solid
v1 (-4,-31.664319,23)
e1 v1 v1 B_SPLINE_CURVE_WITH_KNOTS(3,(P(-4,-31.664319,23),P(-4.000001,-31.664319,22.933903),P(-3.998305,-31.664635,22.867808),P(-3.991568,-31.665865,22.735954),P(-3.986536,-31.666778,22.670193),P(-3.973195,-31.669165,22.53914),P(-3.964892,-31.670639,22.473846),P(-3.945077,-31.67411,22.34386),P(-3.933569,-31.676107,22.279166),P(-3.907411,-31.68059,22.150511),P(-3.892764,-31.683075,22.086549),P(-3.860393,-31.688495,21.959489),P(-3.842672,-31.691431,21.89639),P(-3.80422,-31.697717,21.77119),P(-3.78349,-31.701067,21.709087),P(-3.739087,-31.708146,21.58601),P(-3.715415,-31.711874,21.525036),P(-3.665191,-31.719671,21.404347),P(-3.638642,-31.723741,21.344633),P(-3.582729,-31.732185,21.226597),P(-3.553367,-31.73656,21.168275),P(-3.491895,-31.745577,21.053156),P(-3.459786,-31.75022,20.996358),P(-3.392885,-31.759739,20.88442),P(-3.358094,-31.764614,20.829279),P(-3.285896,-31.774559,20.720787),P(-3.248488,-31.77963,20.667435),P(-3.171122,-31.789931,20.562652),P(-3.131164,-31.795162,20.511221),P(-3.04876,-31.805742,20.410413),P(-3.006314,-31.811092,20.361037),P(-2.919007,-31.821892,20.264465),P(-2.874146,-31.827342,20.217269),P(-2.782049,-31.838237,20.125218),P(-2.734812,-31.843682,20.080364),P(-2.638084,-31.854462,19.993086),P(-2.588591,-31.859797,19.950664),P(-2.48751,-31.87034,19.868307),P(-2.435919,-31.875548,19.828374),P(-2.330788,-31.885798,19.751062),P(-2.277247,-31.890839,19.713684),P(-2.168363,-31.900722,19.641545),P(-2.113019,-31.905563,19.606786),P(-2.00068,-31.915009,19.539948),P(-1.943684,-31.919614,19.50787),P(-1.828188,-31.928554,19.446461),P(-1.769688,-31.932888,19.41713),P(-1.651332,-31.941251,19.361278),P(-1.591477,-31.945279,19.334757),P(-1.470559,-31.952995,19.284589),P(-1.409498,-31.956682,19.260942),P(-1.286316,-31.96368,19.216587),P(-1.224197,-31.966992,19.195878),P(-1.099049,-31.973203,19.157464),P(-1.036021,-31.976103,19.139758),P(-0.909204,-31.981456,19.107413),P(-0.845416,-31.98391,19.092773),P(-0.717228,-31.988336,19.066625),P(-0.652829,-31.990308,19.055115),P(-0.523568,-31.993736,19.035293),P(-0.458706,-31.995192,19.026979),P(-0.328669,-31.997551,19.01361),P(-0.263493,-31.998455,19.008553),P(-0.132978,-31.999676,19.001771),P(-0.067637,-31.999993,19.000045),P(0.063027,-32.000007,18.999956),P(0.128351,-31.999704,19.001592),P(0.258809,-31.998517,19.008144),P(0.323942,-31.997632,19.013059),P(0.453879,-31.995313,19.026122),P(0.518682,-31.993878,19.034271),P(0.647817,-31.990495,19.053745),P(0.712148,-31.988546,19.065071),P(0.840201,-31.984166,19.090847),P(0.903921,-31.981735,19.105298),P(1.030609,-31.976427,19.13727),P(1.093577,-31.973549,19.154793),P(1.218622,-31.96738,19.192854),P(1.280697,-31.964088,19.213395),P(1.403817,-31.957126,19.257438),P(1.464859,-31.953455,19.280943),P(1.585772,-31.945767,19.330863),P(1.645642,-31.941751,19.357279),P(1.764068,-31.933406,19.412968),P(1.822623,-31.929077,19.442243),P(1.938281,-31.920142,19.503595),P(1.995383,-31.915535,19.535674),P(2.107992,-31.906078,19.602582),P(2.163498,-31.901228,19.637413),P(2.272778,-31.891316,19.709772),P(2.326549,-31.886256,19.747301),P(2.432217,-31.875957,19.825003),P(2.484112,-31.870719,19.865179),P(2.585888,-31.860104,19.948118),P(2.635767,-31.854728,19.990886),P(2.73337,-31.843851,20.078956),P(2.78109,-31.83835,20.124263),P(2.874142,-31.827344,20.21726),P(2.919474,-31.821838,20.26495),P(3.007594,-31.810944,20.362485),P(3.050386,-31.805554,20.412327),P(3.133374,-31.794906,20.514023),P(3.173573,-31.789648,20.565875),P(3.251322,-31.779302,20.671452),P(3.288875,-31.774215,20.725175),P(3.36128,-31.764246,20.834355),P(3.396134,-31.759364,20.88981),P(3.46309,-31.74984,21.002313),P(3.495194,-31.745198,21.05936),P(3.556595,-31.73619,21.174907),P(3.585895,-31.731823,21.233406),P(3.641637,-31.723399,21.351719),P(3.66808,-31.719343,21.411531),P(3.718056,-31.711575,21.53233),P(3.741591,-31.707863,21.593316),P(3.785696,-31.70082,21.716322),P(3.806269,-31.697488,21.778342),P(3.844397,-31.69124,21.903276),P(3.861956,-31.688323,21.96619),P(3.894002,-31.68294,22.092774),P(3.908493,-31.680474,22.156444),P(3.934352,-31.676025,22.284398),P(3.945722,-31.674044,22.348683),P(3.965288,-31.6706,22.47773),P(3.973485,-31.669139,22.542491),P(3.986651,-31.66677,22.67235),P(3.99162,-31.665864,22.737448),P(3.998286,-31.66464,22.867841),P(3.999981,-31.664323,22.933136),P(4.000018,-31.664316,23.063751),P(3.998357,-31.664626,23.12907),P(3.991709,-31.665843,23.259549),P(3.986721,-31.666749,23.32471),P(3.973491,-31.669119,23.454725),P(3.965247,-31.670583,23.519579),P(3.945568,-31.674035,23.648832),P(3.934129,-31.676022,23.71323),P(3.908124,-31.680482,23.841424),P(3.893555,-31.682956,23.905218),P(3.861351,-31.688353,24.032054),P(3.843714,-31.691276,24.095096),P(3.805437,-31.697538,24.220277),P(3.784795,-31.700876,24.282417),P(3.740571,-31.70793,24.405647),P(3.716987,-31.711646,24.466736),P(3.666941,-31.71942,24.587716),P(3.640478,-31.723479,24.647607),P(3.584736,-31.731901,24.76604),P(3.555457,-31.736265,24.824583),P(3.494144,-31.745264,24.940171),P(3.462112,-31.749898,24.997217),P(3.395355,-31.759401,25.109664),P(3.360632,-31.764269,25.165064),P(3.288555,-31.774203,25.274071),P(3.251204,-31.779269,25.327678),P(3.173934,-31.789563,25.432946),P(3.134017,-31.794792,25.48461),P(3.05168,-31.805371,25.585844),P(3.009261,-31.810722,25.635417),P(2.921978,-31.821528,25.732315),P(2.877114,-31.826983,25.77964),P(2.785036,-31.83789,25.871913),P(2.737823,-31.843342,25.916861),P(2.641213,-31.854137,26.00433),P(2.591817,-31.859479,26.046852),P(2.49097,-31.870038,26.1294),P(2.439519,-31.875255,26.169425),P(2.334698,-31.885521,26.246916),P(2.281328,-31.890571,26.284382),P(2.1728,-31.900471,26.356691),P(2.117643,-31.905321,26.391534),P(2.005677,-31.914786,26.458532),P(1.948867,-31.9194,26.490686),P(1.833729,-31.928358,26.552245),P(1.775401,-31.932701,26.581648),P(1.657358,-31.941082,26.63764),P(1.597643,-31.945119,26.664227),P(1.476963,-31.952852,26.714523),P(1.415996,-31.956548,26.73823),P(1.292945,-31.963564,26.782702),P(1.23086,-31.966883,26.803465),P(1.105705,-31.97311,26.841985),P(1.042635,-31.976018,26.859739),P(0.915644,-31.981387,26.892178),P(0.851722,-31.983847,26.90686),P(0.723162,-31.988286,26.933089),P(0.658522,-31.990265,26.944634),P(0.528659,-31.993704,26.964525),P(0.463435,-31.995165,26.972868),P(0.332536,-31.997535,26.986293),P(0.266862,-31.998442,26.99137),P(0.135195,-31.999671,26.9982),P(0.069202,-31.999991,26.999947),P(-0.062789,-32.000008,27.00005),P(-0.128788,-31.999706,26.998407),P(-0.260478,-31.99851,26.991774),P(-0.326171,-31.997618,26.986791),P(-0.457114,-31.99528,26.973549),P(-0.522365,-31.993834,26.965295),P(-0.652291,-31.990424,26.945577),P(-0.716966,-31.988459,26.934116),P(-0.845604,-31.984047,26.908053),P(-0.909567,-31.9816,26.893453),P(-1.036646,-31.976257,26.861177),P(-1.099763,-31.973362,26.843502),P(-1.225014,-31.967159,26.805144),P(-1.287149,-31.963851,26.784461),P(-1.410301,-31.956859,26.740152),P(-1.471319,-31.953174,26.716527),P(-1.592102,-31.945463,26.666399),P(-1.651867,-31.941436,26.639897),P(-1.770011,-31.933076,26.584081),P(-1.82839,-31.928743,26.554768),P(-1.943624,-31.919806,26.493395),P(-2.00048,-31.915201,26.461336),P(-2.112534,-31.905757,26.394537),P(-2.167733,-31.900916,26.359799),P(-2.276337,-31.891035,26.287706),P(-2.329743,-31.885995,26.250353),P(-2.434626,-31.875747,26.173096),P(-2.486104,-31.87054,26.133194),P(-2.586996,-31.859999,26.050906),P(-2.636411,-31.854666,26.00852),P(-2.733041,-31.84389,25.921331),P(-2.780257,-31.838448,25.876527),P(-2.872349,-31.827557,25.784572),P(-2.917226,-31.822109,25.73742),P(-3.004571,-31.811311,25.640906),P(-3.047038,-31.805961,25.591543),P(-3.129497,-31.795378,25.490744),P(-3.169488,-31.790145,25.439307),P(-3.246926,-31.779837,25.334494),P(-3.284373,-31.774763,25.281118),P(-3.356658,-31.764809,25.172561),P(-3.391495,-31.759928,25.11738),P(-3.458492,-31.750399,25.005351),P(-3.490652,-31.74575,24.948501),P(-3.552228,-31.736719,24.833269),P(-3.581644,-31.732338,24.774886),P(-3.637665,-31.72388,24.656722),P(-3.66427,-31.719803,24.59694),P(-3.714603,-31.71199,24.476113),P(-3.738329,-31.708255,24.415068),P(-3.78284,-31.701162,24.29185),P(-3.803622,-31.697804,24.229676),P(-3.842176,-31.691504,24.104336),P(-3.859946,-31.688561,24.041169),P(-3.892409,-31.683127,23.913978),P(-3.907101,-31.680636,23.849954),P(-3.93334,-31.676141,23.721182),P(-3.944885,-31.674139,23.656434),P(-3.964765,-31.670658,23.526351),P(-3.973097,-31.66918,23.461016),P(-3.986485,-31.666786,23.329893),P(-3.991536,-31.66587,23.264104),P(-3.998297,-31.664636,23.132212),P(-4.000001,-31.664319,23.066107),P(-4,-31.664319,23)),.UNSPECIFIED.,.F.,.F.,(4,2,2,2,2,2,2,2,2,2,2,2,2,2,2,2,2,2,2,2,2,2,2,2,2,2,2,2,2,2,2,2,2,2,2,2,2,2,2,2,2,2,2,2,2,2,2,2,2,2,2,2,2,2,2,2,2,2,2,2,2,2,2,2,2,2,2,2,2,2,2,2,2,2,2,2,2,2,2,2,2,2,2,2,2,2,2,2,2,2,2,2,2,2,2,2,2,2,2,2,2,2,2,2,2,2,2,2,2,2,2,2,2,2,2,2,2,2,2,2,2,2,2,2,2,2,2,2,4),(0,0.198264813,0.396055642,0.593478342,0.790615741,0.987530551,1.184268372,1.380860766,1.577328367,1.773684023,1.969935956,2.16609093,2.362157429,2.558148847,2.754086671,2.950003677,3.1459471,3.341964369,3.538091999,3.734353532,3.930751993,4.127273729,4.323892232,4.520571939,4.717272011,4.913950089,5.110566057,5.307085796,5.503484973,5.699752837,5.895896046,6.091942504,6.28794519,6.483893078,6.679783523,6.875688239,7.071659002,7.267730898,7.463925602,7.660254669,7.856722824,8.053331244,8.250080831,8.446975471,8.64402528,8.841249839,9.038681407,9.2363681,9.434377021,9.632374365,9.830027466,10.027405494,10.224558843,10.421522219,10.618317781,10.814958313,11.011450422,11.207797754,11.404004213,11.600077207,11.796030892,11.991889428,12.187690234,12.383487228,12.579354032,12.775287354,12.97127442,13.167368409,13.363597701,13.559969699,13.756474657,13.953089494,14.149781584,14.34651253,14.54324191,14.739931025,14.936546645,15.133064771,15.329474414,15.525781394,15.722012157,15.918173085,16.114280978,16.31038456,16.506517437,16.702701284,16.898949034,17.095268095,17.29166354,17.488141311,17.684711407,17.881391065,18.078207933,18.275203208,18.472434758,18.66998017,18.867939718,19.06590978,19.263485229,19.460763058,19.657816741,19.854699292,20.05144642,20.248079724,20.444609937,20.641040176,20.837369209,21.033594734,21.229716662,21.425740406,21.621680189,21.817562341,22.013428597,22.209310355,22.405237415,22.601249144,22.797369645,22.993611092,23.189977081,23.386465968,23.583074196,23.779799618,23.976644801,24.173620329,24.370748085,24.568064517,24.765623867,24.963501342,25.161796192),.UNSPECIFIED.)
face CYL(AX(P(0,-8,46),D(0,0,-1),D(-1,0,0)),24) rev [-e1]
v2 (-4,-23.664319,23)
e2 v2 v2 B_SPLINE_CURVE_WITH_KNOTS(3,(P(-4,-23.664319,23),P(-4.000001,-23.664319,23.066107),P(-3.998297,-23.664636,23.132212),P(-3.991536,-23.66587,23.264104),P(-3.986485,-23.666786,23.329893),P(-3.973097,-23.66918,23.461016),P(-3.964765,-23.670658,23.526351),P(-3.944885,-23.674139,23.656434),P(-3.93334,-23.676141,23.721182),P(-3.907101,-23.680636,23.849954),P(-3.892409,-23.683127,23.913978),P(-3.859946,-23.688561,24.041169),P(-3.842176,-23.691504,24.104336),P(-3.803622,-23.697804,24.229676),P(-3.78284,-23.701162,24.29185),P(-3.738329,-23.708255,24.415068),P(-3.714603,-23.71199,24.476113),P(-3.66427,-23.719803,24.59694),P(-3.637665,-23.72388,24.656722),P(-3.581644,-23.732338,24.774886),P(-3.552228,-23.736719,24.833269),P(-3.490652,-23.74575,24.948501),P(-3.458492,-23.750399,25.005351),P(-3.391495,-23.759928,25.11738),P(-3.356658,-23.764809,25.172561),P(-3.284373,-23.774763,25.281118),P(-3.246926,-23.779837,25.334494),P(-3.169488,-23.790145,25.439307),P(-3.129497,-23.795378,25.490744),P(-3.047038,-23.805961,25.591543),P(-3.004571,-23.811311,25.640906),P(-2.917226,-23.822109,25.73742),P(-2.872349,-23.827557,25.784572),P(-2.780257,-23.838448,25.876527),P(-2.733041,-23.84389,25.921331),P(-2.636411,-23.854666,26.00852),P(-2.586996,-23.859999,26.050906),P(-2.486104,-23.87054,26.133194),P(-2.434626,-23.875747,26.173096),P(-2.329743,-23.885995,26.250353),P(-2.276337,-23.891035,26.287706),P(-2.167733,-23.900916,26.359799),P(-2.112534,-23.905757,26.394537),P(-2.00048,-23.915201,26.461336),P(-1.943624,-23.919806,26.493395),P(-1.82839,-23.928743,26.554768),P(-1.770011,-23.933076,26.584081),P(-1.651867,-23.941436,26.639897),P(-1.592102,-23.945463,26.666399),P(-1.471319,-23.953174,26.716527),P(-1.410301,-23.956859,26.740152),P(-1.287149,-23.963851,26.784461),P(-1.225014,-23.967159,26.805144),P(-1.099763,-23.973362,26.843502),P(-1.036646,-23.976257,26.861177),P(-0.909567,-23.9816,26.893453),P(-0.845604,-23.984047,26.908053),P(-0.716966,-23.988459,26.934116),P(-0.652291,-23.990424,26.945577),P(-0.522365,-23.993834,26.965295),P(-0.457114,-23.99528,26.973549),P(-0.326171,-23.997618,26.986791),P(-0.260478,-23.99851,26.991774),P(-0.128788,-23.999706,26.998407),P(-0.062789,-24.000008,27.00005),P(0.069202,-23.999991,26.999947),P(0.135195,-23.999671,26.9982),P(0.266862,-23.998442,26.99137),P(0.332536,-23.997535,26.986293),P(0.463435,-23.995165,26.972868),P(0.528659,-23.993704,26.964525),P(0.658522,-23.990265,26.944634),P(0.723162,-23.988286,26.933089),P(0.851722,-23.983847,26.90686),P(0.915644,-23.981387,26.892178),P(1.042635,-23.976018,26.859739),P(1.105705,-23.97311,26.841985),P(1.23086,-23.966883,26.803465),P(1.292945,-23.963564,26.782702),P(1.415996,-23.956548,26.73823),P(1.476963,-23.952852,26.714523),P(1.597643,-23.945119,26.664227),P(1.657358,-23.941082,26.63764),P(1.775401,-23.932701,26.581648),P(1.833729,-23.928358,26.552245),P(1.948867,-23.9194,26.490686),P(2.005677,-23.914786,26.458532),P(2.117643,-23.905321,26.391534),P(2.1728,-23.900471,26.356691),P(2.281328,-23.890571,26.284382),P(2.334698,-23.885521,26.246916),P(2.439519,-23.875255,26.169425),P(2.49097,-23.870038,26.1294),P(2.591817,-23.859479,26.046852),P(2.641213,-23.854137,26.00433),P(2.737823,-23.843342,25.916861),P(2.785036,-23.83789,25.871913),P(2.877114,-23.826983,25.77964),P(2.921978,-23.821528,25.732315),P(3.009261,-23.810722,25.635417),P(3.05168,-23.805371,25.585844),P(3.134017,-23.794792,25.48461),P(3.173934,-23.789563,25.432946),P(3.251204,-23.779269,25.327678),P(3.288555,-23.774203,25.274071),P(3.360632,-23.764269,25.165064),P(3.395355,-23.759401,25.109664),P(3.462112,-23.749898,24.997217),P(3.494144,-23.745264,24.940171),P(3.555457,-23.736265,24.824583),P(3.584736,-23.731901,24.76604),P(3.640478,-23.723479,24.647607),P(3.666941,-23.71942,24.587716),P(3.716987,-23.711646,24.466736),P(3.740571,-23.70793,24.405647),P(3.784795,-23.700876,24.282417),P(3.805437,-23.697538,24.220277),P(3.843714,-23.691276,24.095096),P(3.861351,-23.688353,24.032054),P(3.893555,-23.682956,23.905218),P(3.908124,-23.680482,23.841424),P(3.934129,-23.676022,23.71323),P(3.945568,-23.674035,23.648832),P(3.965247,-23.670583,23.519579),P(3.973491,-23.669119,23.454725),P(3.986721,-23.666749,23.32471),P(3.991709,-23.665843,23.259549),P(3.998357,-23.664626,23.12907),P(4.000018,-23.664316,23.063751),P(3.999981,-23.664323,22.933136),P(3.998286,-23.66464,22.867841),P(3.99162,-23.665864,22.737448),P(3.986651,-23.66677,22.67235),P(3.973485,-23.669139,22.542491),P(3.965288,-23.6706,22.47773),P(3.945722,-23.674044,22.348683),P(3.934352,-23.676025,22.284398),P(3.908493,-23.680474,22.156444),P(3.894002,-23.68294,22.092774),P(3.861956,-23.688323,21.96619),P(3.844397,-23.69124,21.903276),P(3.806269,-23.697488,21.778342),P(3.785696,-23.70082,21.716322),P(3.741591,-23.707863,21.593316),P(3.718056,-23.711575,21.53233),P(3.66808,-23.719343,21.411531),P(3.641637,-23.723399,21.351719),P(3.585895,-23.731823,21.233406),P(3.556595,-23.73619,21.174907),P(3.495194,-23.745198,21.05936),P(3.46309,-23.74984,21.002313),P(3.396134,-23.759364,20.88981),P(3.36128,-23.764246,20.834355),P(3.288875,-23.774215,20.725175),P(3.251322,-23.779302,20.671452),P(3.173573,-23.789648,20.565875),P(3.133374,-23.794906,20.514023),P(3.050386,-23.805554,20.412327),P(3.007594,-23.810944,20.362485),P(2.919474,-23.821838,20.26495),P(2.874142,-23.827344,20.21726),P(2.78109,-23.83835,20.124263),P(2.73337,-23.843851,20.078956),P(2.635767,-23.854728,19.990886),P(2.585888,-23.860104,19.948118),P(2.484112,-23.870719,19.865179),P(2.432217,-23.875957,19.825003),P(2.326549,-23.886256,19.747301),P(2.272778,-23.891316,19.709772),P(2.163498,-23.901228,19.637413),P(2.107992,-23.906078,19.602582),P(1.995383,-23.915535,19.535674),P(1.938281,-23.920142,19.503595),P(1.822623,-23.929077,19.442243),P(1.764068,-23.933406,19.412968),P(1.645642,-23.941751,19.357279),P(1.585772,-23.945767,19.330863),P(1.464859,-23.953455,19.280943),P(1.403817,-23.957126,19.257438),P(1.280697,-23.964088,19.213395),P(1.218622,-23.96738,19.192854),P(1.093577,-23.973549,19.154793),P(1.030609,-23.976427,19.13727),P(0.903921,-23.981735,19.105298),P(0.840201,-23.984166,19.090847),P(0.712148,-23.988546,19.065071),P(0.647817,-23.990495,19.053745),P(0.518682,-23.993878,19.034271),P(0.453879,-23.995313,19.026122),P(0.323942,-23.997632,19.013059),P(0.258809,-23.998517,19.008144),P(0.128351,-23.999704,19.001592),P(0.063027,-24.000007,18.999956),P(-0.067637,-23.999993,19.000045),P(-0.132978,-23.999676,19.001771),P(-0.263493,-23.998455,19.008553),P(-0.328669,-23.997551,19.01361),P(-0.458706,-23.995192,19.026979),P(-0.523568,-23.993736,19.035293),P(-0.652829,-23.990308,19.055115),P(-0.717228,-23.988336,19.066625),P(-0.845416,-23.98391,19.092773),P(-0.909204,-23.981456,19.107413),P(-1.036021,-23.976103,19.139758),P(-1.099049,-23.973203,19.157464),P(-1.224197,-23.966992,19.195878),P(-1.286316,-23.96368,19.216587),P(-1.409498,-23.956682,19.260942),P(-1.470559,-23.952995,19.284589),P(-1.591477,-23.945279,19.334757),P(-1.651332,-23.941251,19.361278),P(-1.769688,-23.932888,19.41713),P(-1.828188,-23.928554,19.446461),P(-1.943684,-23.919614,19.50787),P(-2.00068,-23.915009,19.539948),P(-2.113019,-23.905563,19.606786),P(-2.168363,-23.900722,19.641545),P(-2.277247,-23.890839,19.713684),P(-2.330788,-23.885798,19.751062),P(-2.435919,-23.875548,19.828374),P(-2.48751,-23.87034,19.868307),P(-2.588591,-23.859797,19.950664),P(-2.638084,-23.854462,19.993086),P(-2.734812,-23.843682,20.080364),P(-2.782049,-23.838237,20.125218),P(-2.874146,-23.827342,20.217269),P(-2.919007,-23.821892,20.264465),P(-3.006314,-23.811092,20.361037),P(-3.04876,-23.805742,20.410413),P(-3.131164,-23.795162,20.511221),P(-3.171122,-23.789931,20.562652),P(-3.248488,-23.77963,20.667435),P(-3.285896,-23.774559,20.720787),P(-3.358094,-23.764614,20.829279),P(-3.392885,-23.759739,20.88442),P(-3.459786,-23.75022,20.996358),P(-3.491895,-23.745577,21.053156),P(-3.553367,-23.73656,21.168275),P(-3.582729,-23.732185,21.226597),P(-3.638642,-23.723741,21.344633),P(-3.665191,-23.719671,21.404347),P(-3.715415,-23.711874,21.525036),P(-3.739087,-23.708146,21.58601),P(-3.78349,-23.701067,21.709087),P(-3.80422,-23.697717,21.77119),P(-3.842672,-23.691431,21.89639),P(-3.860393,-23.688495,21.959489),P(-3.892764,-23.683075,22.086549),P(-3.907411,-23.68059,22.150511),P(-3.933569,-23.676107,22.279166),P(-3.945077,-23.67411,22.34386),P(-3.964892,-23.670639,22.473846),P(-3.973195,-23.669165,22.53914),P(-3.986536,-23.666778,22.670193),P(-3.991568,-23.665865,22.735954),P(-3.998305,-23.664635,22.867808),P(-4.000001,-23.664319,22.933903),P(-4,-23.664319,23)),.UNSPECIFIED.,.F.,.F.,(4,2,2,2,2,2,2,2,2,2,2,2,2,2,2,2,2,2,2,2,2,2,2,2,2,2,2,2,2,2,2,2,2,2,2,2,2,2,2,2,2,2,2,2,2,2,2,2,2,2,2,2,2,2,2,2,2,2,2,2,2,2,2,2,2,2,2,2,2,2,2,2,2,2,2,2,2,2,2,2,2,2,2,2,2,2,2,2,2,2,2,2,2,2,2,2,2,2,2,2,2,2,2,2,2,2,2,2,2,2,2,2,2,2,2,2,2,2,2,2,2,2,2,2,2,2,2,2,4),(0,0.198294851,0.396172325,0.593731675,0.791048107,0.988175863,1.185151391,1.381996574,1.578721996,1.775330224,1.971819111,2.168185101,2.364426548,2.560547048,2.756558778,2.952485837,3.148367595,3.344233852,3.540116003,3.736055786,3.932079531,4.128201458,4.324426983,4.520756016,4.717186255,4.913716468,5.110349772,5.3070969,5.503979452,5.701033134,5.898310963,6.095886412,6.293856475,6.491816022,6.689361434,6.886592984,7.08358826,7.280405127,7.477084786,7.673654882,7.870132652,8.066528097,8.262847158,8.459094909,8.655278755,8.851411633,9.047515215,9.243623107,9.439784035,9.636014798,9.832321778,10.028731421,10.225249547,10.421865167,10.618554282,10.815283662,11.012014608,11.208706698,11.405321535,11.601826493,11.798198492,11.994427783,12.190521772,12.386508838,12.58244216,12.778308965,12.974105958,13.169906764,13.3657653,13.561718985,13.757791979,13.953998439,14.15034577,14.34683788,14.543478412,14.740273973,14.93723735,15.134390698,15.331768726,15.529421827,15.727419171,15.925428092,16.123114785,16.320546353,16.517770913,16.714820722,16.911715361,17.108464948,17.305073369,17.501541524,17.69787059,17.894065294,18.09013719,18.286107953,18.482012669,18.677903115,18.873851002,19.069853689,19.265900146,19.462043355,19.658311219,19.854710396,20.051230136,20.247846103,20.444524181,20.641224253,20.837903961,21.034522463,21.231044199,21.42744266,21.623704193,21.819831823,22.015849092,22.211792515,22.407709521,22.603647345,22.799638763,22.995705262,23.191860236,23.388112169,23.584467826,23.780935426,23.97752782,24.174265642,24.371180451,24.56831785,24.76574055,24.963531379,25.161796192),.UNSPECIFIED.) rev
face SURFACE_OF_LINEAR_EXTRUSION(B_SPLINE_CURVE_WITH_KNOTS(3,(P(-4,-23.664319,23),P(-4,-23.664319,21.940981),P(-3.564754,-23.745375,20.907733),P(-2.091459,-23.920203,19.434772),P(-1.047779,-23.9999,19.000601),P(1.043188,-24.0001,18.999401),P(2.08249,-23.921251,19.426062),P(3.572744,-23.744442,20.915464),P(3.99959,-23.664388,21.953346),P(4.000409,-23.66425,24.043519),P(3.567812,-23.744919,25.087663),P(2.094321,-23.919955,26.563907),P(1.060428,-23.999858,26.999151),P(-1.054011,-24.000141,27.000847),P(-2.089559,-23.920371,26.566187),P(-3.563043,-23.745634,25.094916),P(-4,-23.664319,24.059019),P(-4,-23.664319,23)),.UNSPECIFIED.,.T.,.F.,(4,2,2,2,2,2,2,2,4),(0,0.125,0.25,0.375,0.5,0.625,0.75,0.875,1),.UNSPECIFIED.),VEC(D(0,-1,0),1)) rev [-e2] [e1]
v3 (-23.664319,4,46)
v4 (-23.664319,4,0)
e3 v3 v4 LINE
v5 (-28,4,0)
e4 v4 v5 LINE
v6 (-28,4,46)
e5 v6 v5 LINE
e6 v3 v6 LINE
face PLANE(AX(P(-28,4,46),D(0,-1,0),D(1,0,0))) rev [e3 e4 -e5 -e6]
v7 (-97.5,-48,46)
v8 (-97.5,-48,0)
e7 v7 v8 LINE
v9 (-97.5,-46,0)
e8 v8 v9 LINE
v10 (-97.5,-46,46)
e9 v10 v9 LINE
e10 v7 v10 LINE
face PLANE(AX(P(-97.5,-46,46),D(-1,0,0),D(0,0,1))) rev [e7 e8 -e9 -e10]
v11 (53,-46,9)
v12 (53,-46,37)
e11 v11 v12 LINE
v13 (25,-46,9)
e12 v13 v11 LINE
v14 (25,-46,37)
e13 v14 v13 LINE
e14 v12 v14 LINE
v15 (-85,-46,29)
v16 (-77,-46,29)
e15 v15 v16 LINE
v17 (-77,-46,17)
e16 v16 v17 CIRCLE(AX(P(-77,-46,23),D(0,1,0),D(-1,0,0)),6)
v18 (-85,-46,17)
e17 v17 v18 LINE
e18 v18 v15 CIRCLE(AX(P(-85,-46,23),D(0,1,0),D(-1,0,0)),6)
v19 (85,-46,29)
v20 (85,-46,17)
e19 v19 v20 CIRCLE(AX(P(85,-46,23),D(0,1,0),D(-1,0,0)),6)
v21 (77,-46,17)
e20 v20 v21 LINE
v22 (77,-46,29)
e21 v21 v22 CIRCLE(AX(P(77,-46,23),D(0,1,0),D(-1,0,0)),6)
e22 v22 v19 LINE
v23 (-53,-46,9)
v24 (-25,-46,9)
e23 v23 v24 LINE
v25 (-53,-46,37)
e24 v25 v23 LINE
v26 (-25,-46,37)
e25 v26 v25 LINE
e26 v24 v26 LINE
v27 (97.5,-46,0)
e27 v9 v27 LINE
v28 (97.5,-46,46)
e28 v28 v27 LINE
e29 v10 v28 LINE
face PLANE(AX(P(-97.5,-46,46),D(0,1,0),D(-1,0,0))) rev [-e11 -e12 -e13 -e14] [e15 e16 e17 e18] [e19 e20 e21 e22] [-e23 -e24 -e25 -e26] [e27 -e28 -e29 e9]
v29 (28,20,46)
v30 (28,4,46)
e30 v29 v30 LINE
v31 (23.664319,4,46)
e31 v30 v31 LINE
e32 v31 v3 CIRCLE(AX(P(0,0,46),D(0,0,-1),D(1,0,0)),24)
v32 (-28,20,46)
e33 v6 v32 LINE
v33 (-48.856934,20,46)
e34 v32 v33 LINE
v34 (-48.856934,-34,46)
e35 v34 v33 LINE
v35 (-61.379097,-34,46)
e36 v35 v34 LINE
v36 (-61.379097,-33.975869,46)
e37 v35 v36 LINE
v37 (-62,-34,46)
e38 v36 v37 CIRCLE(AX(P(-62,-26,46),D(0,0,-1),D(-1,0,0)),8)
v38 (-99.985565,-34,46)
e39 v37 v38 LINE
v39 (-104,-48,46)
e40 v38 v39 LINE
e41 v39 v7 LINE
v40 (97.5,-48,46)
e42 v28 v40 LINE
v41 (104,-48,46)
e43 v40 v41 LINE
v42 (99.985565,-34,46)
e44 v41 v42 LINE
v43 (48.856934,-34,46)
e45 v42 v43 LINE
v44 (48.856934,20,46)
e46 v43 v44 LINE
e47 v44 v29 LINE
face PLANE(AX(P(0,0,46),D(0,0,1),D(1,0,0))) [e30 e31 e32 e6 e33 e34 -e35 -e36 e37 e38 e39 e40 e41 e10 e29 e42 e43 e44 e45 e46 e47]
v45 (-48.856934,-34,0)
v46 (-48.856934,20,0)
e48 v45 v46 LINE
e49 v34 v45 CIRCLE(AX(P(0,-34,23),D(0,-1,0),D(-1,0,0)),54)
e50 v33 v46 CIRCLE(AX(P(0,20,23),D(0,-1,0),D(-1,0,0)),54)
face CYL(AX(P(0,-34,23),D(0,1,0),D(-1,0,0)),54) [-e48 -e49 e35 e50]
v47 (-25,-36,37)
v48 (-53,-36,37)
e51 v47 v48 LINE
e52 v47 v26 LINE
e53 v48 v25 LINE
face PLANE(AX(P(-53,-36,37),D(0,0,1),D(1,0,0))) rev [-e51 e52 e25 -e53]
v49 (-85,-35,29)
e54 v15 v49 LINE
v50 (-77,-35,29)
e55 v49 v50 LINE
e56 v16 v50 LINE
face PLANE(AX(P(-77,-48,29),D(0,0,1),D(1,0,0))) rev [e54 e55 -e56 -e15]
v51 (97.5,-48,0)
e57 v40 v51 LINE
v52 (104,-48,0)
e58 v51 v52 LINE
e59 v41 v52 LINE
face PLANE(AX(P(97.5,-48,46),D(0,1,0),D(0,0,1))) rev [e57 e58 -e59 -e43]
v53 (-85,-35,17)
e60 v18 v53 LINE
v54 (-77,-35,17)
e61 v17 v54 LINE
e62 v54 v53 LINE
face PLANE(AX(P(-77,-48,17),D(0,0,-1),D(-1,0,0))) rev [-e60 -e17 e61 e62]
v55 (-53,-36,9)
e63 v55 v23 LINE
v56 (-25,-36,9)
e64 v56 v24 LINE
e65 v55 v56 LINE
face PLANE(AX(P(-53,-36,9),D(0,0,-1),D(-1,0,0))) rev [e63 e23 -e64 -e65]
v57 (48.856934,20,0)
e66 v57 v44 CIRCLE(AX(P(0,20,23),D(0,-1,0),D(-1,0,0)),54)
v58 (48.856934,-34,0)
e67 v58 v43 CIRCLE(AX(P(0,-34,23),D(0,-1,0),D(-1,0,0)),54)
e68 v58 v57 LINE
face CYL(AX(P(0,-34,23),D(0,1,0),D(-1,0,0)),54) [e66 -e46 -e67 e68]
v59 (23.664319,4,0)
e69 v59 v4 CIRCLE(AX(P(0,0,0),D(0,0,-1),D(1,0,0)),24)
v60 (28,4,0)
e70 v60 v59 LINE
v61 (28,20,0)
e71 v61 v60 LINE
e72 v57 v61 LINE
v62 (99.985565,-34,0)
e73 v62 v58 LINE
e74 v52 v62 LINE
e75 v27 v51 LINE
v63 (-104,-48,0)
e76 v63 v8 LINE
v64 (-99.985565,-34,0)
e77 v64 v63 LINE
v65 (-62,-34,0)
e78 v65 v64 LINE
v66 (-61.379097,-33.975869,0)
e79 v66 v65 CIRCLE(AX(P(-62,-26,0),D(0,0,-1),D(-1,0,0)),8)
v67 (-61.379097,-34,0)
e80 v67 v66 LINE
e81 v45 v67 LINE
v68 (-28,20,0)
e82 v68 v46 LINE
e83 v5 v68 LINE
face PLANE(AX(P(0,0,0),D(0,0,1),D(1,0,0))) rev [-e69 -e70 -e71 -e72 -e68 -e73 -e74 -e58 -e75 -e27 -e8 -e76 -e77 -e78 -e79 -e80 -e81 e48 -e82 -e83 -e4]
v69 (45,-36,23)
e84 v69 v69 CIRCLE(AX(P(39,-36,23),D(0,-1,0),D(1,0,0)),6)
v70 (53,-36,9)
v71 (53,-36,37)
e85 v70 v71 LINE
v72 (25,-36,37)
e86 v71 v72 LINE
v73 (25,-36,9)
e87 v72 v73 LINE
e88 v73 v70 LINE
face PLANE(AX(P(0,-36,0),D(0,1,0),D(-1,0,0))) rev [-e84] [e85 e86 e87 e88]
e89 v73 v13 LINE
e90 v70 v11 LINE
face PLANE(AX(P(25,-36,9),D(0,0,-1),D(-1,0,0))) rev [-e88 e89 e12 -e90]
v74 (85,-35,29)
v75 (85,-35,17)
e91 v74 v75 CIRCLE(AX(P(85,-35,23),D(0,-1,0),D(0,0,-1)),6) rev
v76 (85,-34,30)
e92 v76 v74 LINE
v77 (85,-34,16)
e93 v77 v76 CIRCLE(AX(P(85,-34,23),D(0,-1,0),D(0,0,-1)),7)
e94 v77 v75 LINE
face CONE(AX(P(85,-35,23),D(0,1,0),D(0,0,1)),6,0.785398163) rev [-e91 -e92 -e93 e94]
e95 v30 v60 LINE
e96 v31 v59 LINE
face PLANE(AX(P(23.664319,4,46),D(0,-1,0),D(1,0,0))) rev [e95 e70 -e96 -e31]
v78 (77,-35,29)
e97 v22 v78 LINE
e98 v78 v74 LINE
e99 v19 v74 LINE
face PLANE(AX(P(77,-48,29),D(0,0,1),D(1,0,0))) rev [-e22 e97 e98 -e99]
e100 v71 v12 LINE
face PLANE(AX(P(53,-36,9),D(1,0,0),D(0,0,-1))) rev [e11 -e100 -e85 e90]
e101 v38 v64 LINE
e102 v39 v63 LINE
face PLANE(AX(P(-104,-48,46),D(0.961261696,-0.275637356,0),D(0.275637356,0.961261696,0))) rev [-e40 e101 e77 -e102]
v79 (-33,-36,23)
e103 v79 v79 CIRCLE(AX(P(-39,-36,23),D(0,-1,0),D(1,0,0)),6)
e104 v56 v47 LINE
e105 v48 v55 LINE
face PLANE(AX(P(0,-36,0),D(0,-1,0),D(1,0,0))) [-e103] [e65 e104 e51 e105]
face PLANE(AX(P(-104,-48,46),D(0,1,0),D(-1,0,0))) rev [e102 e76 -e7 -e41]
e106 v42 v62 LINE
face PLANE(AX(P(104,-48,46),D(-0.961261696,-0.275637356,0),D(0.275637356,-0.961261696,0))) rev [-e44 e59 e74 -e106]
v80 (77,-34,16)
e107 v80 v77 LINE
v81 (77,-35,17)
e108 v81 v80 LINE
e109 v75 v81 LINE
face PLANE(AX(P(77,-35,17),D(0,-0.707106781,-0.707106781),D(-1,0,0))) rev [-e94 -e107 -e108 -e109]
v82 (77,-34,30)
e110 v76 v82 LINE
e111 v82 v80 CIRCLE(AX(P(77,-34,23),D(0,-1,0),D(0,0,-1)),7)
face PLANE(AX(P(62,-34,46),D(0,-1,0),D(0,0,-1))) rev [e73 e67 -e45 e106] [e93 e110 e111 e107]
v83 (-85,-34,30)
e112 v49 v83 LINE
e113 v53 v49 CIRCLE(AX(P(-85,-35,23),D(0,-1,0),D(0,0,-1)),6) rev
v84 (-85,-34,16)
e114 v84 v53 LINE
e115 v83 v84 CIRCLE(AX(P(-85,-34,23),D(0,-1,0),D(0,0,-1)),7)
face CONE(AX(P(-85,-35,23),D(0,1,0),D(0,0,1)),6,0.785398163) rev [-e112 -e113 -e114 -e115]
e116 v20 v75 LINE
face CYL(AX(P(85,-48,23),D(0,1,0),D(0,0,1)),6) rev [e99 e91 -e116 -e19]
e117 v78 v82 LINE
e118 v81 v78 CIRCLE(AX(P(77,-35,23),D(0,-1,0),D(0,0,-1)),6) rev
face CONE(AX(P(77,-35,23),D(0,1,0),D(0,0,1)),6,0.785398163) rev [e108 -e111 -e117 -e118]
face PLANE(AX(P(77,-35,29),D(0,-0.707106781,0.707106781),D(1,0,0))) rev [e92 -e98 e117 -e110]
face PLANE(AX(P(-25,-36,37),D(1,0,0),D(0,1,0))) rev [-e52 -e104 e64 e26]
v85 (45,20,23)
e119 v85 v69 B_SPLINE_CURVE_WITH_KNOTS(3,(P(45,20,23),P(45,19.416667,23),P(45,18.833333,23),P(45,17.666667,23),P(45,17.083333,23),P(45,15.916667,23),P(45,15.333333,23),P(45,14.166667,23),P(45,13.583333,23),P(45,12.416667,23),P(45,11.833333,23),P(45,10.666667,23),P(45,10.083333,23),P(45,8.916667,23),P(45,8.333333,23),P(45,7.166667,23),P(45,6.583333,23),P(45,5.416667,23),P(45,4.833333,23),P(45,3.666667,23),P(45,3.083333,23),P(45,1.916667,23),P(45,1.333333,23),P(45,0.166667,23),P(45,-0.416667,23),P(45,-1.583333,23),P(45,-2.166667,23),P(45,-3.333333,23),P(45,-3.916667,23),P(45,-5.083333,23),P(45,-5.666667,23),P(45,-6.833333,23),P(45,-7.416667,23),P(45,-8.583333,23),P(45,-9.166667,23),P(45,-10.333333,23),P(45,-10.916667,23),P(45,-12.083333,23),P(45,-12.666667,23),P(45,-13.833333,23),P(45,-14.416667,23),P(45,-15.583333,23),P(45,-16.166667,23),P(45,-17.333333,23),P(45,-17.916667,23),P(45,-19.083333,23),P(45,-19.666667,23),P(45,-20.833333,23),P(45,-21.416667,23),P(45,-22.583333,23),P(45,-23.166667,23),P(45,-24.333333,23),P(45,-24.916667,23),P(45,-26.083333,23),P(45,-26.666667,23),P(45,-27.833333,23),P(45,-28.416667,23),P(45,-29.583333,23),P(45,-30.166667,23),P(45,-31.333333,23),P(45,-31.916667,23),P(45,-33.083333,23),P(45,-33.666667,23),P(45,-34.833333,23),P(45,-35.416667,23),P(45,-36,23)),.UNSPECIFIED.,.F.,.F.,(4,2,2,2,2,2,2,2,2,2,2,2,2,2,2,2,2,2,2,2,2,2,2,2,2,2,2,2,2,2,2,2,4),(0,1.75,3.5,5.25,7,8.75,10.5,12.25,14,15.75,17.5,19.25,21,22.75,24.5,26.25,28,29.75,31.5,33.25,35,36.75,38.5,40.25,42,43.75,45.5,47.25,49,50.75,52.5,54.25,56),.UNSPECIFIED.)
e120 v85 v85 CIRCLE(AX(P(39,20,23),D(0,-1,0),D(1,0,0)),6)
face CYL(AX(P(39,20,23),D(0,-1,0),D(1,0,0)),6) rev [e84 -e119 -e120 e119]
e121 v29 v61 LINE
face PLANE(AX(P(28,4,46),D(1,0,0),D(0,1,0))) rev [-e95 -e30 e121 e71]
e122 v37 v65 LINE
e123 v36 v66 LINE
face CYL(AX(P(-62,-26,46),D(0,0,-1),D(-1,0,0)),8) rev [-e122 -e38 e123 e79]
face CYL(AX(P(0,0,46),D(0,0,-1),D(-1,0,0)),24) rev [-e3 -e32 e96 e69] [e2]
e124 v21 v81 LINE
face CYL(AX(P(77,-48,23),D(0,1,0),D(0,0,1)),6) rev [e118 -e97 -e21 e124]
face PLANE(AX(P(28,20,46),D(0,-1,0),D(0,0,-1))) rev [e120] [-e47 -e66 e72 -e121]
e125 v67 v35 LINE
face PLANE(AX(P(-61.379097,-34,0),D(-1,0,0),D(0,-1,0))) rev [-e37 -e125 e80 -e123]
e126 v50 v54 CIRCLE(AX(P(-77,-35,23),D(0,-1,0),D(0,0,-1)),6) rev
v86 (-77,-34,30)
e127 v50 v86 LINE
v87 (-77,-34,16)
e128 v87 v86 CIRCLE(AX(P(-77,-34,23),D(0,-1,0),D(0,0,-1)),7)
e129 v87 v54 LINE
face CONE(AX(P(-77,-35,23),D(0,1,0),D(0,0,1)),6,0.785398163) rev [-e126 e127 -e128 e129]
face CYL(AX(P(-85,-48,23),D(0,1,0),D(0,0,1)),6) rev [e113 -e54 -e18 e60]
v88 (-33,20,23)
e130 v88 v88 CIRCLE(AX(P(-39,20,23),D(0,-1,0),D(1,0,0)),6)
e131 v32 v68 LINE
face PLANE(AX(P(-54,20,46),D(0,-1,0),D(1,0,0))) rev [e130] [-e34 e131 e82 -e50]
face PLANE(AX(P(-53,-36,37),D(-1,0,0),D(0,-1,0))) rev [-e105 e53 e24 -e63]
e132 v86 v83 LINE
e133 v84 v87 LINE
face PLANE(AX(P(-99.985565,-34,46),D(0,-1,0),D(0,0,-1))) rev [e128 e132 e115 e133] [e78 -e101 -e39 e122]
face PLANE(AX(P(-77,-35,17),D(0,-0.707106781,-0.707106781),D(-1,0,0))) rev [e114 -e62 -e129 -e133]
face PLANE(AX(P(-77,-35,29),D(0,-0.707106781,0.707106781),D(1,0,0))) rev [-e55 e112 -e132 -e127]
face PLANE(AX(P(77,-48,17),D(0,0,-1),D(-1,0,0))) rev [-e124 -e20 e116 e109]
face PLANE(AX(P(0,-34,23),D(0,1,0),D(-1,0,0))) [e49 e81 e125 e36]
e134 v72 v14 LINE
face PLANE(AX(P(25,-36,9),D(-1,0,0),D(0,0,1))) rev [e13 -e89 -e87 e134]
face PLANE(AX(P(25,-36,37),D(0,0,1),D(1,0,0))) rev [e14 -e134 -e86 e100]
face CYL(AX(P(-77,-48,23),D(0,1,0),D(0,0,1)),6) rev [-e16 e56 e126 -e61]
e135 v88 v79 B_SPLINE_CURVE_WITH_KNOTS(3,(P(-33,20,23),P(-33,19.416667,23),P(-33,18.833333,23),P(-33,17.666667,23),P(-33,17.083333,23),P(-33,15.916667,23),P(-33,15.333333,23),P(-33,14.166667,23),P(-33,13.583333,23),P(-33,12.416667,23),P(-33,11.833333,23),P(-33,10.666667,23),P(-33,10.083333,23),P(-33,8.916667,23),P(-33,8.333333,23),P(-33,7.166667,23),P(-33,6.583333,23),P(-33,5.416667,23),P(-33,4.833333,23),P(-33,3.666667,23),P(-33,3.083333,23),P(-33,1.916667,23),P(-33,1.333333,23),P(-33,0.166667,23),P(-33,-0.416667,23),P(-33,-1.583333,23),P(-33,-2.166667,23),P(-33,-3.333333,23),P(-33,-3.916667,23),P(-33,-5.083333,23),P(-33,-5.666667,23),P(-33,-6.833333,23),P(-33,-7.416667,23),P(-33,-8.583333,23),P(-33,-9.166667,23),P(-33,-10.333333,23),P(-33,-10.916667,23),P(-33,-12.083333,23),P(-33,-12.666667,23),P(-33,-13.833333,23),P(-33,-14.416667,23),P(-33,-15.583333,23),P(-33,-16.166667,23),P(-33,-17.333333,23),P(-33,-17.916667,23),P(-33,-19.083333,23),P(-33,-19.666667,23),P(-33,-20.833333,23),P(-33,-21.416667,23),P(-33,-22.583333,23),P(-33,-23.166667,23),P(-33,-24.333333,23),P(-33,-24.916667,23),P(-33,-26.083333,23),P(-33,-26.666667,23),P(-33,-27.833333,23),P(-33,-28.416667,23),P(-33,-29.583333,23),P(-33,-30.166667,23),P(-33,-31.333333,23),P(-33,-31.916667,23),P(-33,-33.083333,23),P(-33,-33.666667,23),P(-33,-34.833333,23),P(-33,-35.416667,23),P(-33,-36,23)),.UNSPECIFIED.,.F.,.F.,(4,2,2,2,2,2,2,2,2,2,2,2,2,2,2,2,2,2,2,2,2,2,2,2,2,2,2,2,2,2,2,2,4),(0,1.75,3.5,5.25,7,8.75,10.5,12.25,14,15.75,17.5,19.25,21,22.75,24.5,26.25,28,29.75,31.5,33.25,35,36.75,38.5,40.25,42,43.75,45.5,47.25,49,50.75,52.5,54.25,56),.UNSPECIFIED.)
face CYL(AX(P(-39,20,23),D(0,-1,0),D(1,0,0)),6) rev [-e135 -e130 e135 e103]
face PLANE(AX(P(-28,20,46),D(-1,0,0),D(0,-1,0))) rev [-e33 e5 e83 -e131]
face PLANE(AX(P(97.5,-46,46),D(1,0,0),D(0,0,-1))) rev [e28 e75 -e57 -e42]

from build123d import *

# Parameters (mm, degrees)
BOSS_EXTRUDE2_DEPTH  = 46
CUT_EXTRUDE1_START   = -52.000000108
CUT_EXTRUDE1_DEPTH   = 36.000000108
CUT_EXTRUDE1_START_2 = 18
CUT_EXTRUDE1_2_DEPTH = 10
CUT_EXTRUDE4_DEPTH   = 126.888839891
CHAMFER1_SIZE        = 1
CUT_EXTRUDE6_DEPTH   = 54
SKETCH7_W            = 28
SKETCH7_H            = 28
CUT_EXTRUDE7_DEPTH   = 10
SKETCH8_R            = 6
CUT_EXTRUDE8_DEPTH   = 127.759615321


with BuildPart() as part:
    # Sketch1 → Boss-Extrude2 (new body)
    with BuildSketch(Plane.XY):
        with BuildLine():
            Line((-28, 20), (-28, 4))
            Line((-28, 4), (-23.664319132, 4))
            ThreePointArc((-23.664319132, 4), (0, -24), (23.664319132, 4))
            Line((23.664319132, 4), (28, 4))
            Line((28, 4), (28, 20))
            Line((28, 20), (54, 20))
            Line((54, 20), (54, -26))
            ThreePointArc((54, -26), (56.343145751, -31.656854249), (62, -34))
            Line((62, -34), (99.985564599, -34))
            Line((99.985564599, -34), (104, -48))
            Line((104, -48), (97.5, -48))
            Line((97.5, -48), (97.5, -46))
            Line((97.5, -46), (-97.5, -46))
            Line((-97.5, -46), (-97.5, -48))
            Line((-97.5, -48), (-104, -48))
            Line((-104, -48), (-99.985564599, -34))
            Line((-99.985564599, -34), (-62, -34))
            ThreePointArc((-62, -34), (-56.343145751, -31.656854249), (-54, -26))
            Line((-54, -26), (-54, 20))
            Line((-54, 20), (-28, 20))
        make_face()
    extrude(amount=BOSS_EXTRUDE2_DEPTH)

    # Cut-Extrude1: read off the stored shape, not the designer's step
    # Cut-Extrude1 outline → Cut-Extrude1 (cut)
    with BuildSketch(Plane(origin=(0, 20, 0), x_dir=(1, 0, 0), z_dir=(0, 1, 0)).offset(CUT_EXTRUDE1_START)):
        with BuildLine():
            add(Edge.make_bspline(
                [(-4, -23), (-4, -21.940981337), (-3.564754015, -20.907732875), (-2.091459192, -19.434771906), (-1.047779124, -19.000600686), (1.043187737, -18.999400631), (2.08248981, -19.42606245), (3.572744195, -20.91546352), (3.999590121, -21.953345573), (4.000409264, -24.043519212), (3.567812098, -25.087662609), (2.094321457, -26.563907402), (1.060428453, -26.999150693), (-1.054011474, -27.000846733), (-2.089559005, -26.5661873), (-3.563043078, -25.094915922), (-4, -24.059018663), (-4, -23)],
                knots=[0, 0, 0, 0, 0.125, 0.125, 0.25, 0.25, 0.375, 0.375, 0.5, 0.5, 0.625, 0.625, 0.75, 0.75, 0.875, 0.875, 1, 1, 1, 1], degree=3))
        make_face()
    extrude(amount=CUT_EXTRUDE1_DEPTH, mode=Mode.SUBTRACT)

    # Cut-Extrude1 2 outline → Cut-Extrude1 2 (add)
    with BuildSketch(Plane.XY.offset(CUT_EXTRUDE1_START_2)):
        with BuildLine():
            Line((5, -31.49528396), (4.000099427, -31.664302326))
            ThreePointArc((4.000099427, -31.664302326), (2.007080448, -31.915928334), (-8.2e-08, -32))
            Line((-8.2e-08, -32), (5, -32.000000108))
            Line((5, -32.000000108), (5, -31.49528396))
        make_face()
        with BuildLine():
            Line((-5, -32.000000108), (-8.2e-08, -32))
            ThreePointArc((-8.2e-08, -32), (-2.00703047, -31.915932528), (-4.000000362, -31.664319071))
            Line((-4.000000362, -31.664319071), (-5, -31.495288265))
            Line((-5, -31.495288265), (-5, -32.000000108))
        make_face()
    extrude(amount=CUT_EXTRUDE1_2_DEPTH)

    # Sketch5 → Cut-Extrude4 (cut, through all)
    with BuildSketch(Plane(origin=(0, -34, 0), x_dir=(1, 0, 0), z_dir=(0, 1, 0))):
        with BuildLine():
            Line((77, -17), (85, -17))
            ThreePointArc((85, -17), (91, -23), (85, -29))
            Line((85, -29), (77, -29))
            ThreePointArc((77, -29), (71, -23), (77, -17))
        make_face()
        with BuildLine():
            Line((-77, -17), (-85, -17))
            ThreePointArc((-85, -17), (-91, -23), (-85, -29))
            Line((-85, -29), (-77, -29))
            ThreePointArc((-77, -29), (-71, -23), (-77, -17))
        make_face()
    extrude(amount=-CUT_EXTRUDE4_DEPTH, mode=Mode.SUBTRACT)

    # Chamfer1
    chamfer1_edges = [part.edges().sort_by_distance(p)[0] for p in [
        (71, -34, 23),
        (81, -34, 29),
        (91, -34, 23),
        (81, -34, 17),
        (-71, -34, 23),
        (-81, -34, 17),
        (-91, -34, 23),
        (-81, -34, 29),
    ]]
    chamfer(chamfer1_edges, length=CHAMFER1_SIZE)

    # Sketch6 → Cut-Extrude6 (cut)
    with BuildSketch(Plane(origin=(0, 20, 0), x_dir=(1, 0, 0), z_dir=(0, 1, 0))):
        with BuildLine():
            Line((54, -46), (48.856934001, -46))
            ThreePointArc((48.856934001, -46), (54, -23), (48.856934001, 0))
            Line((48.856934001, 0), (54, 0))
            Line((54, 0), (63.209098635, 0))
            Line((63.209098635, 0), (63.209098635, -46))
            Line((63.209098635, -46), (54, -46))
        make_face()
        with BuildLine():
            Line((-48.856934001, -46), (-54, -46))
            Line((-54, -46), (-61.379097466, -46))
            Line((-61.379097466, -46), (-61.379097466, 0))
            Line((-61.379097466, 0), (-54, 0))
            Line((-54, 0), (-48.856934001, 0))
            ThreePointArc((-48.856934001, 0), (-54, -23), (-48.856934001, -46))
        make_face()
    extrude(amount=-CUT_EXTRUDE6_DEPTH, mode=Mode.SUBTRACT)

    # Sketch7 → Cut-Extrude7 (cut)
    with BuildSketch(Plane.XZ.offset(46)):
        with Locations((-39, 23)):
            Rectangle(SKETCH7_W, SKETCH7_H)
        with Locations((39, 23)):
            Rectangle(SKETCH7_W, SKETCH7_H)
    extrude(amount=-CUT_EXTRUDE7_DEPTH, mode=Mode.SUBTRACT)

    # Sketch8 → Cut-Extrude8 (cut, through all)
    with BuildSketch(Plane.XZ.offset(36)):
        with Locations((-39, 23)):
            Circle(SKETCH8_R)
        with Locations((39, 23)):
            Circle(SKETCH8_R)
    extrude(amount=-CUT_EXTRUDE8_DEPTH, mode=Mode.SUBTRACT)


solid = part.part
